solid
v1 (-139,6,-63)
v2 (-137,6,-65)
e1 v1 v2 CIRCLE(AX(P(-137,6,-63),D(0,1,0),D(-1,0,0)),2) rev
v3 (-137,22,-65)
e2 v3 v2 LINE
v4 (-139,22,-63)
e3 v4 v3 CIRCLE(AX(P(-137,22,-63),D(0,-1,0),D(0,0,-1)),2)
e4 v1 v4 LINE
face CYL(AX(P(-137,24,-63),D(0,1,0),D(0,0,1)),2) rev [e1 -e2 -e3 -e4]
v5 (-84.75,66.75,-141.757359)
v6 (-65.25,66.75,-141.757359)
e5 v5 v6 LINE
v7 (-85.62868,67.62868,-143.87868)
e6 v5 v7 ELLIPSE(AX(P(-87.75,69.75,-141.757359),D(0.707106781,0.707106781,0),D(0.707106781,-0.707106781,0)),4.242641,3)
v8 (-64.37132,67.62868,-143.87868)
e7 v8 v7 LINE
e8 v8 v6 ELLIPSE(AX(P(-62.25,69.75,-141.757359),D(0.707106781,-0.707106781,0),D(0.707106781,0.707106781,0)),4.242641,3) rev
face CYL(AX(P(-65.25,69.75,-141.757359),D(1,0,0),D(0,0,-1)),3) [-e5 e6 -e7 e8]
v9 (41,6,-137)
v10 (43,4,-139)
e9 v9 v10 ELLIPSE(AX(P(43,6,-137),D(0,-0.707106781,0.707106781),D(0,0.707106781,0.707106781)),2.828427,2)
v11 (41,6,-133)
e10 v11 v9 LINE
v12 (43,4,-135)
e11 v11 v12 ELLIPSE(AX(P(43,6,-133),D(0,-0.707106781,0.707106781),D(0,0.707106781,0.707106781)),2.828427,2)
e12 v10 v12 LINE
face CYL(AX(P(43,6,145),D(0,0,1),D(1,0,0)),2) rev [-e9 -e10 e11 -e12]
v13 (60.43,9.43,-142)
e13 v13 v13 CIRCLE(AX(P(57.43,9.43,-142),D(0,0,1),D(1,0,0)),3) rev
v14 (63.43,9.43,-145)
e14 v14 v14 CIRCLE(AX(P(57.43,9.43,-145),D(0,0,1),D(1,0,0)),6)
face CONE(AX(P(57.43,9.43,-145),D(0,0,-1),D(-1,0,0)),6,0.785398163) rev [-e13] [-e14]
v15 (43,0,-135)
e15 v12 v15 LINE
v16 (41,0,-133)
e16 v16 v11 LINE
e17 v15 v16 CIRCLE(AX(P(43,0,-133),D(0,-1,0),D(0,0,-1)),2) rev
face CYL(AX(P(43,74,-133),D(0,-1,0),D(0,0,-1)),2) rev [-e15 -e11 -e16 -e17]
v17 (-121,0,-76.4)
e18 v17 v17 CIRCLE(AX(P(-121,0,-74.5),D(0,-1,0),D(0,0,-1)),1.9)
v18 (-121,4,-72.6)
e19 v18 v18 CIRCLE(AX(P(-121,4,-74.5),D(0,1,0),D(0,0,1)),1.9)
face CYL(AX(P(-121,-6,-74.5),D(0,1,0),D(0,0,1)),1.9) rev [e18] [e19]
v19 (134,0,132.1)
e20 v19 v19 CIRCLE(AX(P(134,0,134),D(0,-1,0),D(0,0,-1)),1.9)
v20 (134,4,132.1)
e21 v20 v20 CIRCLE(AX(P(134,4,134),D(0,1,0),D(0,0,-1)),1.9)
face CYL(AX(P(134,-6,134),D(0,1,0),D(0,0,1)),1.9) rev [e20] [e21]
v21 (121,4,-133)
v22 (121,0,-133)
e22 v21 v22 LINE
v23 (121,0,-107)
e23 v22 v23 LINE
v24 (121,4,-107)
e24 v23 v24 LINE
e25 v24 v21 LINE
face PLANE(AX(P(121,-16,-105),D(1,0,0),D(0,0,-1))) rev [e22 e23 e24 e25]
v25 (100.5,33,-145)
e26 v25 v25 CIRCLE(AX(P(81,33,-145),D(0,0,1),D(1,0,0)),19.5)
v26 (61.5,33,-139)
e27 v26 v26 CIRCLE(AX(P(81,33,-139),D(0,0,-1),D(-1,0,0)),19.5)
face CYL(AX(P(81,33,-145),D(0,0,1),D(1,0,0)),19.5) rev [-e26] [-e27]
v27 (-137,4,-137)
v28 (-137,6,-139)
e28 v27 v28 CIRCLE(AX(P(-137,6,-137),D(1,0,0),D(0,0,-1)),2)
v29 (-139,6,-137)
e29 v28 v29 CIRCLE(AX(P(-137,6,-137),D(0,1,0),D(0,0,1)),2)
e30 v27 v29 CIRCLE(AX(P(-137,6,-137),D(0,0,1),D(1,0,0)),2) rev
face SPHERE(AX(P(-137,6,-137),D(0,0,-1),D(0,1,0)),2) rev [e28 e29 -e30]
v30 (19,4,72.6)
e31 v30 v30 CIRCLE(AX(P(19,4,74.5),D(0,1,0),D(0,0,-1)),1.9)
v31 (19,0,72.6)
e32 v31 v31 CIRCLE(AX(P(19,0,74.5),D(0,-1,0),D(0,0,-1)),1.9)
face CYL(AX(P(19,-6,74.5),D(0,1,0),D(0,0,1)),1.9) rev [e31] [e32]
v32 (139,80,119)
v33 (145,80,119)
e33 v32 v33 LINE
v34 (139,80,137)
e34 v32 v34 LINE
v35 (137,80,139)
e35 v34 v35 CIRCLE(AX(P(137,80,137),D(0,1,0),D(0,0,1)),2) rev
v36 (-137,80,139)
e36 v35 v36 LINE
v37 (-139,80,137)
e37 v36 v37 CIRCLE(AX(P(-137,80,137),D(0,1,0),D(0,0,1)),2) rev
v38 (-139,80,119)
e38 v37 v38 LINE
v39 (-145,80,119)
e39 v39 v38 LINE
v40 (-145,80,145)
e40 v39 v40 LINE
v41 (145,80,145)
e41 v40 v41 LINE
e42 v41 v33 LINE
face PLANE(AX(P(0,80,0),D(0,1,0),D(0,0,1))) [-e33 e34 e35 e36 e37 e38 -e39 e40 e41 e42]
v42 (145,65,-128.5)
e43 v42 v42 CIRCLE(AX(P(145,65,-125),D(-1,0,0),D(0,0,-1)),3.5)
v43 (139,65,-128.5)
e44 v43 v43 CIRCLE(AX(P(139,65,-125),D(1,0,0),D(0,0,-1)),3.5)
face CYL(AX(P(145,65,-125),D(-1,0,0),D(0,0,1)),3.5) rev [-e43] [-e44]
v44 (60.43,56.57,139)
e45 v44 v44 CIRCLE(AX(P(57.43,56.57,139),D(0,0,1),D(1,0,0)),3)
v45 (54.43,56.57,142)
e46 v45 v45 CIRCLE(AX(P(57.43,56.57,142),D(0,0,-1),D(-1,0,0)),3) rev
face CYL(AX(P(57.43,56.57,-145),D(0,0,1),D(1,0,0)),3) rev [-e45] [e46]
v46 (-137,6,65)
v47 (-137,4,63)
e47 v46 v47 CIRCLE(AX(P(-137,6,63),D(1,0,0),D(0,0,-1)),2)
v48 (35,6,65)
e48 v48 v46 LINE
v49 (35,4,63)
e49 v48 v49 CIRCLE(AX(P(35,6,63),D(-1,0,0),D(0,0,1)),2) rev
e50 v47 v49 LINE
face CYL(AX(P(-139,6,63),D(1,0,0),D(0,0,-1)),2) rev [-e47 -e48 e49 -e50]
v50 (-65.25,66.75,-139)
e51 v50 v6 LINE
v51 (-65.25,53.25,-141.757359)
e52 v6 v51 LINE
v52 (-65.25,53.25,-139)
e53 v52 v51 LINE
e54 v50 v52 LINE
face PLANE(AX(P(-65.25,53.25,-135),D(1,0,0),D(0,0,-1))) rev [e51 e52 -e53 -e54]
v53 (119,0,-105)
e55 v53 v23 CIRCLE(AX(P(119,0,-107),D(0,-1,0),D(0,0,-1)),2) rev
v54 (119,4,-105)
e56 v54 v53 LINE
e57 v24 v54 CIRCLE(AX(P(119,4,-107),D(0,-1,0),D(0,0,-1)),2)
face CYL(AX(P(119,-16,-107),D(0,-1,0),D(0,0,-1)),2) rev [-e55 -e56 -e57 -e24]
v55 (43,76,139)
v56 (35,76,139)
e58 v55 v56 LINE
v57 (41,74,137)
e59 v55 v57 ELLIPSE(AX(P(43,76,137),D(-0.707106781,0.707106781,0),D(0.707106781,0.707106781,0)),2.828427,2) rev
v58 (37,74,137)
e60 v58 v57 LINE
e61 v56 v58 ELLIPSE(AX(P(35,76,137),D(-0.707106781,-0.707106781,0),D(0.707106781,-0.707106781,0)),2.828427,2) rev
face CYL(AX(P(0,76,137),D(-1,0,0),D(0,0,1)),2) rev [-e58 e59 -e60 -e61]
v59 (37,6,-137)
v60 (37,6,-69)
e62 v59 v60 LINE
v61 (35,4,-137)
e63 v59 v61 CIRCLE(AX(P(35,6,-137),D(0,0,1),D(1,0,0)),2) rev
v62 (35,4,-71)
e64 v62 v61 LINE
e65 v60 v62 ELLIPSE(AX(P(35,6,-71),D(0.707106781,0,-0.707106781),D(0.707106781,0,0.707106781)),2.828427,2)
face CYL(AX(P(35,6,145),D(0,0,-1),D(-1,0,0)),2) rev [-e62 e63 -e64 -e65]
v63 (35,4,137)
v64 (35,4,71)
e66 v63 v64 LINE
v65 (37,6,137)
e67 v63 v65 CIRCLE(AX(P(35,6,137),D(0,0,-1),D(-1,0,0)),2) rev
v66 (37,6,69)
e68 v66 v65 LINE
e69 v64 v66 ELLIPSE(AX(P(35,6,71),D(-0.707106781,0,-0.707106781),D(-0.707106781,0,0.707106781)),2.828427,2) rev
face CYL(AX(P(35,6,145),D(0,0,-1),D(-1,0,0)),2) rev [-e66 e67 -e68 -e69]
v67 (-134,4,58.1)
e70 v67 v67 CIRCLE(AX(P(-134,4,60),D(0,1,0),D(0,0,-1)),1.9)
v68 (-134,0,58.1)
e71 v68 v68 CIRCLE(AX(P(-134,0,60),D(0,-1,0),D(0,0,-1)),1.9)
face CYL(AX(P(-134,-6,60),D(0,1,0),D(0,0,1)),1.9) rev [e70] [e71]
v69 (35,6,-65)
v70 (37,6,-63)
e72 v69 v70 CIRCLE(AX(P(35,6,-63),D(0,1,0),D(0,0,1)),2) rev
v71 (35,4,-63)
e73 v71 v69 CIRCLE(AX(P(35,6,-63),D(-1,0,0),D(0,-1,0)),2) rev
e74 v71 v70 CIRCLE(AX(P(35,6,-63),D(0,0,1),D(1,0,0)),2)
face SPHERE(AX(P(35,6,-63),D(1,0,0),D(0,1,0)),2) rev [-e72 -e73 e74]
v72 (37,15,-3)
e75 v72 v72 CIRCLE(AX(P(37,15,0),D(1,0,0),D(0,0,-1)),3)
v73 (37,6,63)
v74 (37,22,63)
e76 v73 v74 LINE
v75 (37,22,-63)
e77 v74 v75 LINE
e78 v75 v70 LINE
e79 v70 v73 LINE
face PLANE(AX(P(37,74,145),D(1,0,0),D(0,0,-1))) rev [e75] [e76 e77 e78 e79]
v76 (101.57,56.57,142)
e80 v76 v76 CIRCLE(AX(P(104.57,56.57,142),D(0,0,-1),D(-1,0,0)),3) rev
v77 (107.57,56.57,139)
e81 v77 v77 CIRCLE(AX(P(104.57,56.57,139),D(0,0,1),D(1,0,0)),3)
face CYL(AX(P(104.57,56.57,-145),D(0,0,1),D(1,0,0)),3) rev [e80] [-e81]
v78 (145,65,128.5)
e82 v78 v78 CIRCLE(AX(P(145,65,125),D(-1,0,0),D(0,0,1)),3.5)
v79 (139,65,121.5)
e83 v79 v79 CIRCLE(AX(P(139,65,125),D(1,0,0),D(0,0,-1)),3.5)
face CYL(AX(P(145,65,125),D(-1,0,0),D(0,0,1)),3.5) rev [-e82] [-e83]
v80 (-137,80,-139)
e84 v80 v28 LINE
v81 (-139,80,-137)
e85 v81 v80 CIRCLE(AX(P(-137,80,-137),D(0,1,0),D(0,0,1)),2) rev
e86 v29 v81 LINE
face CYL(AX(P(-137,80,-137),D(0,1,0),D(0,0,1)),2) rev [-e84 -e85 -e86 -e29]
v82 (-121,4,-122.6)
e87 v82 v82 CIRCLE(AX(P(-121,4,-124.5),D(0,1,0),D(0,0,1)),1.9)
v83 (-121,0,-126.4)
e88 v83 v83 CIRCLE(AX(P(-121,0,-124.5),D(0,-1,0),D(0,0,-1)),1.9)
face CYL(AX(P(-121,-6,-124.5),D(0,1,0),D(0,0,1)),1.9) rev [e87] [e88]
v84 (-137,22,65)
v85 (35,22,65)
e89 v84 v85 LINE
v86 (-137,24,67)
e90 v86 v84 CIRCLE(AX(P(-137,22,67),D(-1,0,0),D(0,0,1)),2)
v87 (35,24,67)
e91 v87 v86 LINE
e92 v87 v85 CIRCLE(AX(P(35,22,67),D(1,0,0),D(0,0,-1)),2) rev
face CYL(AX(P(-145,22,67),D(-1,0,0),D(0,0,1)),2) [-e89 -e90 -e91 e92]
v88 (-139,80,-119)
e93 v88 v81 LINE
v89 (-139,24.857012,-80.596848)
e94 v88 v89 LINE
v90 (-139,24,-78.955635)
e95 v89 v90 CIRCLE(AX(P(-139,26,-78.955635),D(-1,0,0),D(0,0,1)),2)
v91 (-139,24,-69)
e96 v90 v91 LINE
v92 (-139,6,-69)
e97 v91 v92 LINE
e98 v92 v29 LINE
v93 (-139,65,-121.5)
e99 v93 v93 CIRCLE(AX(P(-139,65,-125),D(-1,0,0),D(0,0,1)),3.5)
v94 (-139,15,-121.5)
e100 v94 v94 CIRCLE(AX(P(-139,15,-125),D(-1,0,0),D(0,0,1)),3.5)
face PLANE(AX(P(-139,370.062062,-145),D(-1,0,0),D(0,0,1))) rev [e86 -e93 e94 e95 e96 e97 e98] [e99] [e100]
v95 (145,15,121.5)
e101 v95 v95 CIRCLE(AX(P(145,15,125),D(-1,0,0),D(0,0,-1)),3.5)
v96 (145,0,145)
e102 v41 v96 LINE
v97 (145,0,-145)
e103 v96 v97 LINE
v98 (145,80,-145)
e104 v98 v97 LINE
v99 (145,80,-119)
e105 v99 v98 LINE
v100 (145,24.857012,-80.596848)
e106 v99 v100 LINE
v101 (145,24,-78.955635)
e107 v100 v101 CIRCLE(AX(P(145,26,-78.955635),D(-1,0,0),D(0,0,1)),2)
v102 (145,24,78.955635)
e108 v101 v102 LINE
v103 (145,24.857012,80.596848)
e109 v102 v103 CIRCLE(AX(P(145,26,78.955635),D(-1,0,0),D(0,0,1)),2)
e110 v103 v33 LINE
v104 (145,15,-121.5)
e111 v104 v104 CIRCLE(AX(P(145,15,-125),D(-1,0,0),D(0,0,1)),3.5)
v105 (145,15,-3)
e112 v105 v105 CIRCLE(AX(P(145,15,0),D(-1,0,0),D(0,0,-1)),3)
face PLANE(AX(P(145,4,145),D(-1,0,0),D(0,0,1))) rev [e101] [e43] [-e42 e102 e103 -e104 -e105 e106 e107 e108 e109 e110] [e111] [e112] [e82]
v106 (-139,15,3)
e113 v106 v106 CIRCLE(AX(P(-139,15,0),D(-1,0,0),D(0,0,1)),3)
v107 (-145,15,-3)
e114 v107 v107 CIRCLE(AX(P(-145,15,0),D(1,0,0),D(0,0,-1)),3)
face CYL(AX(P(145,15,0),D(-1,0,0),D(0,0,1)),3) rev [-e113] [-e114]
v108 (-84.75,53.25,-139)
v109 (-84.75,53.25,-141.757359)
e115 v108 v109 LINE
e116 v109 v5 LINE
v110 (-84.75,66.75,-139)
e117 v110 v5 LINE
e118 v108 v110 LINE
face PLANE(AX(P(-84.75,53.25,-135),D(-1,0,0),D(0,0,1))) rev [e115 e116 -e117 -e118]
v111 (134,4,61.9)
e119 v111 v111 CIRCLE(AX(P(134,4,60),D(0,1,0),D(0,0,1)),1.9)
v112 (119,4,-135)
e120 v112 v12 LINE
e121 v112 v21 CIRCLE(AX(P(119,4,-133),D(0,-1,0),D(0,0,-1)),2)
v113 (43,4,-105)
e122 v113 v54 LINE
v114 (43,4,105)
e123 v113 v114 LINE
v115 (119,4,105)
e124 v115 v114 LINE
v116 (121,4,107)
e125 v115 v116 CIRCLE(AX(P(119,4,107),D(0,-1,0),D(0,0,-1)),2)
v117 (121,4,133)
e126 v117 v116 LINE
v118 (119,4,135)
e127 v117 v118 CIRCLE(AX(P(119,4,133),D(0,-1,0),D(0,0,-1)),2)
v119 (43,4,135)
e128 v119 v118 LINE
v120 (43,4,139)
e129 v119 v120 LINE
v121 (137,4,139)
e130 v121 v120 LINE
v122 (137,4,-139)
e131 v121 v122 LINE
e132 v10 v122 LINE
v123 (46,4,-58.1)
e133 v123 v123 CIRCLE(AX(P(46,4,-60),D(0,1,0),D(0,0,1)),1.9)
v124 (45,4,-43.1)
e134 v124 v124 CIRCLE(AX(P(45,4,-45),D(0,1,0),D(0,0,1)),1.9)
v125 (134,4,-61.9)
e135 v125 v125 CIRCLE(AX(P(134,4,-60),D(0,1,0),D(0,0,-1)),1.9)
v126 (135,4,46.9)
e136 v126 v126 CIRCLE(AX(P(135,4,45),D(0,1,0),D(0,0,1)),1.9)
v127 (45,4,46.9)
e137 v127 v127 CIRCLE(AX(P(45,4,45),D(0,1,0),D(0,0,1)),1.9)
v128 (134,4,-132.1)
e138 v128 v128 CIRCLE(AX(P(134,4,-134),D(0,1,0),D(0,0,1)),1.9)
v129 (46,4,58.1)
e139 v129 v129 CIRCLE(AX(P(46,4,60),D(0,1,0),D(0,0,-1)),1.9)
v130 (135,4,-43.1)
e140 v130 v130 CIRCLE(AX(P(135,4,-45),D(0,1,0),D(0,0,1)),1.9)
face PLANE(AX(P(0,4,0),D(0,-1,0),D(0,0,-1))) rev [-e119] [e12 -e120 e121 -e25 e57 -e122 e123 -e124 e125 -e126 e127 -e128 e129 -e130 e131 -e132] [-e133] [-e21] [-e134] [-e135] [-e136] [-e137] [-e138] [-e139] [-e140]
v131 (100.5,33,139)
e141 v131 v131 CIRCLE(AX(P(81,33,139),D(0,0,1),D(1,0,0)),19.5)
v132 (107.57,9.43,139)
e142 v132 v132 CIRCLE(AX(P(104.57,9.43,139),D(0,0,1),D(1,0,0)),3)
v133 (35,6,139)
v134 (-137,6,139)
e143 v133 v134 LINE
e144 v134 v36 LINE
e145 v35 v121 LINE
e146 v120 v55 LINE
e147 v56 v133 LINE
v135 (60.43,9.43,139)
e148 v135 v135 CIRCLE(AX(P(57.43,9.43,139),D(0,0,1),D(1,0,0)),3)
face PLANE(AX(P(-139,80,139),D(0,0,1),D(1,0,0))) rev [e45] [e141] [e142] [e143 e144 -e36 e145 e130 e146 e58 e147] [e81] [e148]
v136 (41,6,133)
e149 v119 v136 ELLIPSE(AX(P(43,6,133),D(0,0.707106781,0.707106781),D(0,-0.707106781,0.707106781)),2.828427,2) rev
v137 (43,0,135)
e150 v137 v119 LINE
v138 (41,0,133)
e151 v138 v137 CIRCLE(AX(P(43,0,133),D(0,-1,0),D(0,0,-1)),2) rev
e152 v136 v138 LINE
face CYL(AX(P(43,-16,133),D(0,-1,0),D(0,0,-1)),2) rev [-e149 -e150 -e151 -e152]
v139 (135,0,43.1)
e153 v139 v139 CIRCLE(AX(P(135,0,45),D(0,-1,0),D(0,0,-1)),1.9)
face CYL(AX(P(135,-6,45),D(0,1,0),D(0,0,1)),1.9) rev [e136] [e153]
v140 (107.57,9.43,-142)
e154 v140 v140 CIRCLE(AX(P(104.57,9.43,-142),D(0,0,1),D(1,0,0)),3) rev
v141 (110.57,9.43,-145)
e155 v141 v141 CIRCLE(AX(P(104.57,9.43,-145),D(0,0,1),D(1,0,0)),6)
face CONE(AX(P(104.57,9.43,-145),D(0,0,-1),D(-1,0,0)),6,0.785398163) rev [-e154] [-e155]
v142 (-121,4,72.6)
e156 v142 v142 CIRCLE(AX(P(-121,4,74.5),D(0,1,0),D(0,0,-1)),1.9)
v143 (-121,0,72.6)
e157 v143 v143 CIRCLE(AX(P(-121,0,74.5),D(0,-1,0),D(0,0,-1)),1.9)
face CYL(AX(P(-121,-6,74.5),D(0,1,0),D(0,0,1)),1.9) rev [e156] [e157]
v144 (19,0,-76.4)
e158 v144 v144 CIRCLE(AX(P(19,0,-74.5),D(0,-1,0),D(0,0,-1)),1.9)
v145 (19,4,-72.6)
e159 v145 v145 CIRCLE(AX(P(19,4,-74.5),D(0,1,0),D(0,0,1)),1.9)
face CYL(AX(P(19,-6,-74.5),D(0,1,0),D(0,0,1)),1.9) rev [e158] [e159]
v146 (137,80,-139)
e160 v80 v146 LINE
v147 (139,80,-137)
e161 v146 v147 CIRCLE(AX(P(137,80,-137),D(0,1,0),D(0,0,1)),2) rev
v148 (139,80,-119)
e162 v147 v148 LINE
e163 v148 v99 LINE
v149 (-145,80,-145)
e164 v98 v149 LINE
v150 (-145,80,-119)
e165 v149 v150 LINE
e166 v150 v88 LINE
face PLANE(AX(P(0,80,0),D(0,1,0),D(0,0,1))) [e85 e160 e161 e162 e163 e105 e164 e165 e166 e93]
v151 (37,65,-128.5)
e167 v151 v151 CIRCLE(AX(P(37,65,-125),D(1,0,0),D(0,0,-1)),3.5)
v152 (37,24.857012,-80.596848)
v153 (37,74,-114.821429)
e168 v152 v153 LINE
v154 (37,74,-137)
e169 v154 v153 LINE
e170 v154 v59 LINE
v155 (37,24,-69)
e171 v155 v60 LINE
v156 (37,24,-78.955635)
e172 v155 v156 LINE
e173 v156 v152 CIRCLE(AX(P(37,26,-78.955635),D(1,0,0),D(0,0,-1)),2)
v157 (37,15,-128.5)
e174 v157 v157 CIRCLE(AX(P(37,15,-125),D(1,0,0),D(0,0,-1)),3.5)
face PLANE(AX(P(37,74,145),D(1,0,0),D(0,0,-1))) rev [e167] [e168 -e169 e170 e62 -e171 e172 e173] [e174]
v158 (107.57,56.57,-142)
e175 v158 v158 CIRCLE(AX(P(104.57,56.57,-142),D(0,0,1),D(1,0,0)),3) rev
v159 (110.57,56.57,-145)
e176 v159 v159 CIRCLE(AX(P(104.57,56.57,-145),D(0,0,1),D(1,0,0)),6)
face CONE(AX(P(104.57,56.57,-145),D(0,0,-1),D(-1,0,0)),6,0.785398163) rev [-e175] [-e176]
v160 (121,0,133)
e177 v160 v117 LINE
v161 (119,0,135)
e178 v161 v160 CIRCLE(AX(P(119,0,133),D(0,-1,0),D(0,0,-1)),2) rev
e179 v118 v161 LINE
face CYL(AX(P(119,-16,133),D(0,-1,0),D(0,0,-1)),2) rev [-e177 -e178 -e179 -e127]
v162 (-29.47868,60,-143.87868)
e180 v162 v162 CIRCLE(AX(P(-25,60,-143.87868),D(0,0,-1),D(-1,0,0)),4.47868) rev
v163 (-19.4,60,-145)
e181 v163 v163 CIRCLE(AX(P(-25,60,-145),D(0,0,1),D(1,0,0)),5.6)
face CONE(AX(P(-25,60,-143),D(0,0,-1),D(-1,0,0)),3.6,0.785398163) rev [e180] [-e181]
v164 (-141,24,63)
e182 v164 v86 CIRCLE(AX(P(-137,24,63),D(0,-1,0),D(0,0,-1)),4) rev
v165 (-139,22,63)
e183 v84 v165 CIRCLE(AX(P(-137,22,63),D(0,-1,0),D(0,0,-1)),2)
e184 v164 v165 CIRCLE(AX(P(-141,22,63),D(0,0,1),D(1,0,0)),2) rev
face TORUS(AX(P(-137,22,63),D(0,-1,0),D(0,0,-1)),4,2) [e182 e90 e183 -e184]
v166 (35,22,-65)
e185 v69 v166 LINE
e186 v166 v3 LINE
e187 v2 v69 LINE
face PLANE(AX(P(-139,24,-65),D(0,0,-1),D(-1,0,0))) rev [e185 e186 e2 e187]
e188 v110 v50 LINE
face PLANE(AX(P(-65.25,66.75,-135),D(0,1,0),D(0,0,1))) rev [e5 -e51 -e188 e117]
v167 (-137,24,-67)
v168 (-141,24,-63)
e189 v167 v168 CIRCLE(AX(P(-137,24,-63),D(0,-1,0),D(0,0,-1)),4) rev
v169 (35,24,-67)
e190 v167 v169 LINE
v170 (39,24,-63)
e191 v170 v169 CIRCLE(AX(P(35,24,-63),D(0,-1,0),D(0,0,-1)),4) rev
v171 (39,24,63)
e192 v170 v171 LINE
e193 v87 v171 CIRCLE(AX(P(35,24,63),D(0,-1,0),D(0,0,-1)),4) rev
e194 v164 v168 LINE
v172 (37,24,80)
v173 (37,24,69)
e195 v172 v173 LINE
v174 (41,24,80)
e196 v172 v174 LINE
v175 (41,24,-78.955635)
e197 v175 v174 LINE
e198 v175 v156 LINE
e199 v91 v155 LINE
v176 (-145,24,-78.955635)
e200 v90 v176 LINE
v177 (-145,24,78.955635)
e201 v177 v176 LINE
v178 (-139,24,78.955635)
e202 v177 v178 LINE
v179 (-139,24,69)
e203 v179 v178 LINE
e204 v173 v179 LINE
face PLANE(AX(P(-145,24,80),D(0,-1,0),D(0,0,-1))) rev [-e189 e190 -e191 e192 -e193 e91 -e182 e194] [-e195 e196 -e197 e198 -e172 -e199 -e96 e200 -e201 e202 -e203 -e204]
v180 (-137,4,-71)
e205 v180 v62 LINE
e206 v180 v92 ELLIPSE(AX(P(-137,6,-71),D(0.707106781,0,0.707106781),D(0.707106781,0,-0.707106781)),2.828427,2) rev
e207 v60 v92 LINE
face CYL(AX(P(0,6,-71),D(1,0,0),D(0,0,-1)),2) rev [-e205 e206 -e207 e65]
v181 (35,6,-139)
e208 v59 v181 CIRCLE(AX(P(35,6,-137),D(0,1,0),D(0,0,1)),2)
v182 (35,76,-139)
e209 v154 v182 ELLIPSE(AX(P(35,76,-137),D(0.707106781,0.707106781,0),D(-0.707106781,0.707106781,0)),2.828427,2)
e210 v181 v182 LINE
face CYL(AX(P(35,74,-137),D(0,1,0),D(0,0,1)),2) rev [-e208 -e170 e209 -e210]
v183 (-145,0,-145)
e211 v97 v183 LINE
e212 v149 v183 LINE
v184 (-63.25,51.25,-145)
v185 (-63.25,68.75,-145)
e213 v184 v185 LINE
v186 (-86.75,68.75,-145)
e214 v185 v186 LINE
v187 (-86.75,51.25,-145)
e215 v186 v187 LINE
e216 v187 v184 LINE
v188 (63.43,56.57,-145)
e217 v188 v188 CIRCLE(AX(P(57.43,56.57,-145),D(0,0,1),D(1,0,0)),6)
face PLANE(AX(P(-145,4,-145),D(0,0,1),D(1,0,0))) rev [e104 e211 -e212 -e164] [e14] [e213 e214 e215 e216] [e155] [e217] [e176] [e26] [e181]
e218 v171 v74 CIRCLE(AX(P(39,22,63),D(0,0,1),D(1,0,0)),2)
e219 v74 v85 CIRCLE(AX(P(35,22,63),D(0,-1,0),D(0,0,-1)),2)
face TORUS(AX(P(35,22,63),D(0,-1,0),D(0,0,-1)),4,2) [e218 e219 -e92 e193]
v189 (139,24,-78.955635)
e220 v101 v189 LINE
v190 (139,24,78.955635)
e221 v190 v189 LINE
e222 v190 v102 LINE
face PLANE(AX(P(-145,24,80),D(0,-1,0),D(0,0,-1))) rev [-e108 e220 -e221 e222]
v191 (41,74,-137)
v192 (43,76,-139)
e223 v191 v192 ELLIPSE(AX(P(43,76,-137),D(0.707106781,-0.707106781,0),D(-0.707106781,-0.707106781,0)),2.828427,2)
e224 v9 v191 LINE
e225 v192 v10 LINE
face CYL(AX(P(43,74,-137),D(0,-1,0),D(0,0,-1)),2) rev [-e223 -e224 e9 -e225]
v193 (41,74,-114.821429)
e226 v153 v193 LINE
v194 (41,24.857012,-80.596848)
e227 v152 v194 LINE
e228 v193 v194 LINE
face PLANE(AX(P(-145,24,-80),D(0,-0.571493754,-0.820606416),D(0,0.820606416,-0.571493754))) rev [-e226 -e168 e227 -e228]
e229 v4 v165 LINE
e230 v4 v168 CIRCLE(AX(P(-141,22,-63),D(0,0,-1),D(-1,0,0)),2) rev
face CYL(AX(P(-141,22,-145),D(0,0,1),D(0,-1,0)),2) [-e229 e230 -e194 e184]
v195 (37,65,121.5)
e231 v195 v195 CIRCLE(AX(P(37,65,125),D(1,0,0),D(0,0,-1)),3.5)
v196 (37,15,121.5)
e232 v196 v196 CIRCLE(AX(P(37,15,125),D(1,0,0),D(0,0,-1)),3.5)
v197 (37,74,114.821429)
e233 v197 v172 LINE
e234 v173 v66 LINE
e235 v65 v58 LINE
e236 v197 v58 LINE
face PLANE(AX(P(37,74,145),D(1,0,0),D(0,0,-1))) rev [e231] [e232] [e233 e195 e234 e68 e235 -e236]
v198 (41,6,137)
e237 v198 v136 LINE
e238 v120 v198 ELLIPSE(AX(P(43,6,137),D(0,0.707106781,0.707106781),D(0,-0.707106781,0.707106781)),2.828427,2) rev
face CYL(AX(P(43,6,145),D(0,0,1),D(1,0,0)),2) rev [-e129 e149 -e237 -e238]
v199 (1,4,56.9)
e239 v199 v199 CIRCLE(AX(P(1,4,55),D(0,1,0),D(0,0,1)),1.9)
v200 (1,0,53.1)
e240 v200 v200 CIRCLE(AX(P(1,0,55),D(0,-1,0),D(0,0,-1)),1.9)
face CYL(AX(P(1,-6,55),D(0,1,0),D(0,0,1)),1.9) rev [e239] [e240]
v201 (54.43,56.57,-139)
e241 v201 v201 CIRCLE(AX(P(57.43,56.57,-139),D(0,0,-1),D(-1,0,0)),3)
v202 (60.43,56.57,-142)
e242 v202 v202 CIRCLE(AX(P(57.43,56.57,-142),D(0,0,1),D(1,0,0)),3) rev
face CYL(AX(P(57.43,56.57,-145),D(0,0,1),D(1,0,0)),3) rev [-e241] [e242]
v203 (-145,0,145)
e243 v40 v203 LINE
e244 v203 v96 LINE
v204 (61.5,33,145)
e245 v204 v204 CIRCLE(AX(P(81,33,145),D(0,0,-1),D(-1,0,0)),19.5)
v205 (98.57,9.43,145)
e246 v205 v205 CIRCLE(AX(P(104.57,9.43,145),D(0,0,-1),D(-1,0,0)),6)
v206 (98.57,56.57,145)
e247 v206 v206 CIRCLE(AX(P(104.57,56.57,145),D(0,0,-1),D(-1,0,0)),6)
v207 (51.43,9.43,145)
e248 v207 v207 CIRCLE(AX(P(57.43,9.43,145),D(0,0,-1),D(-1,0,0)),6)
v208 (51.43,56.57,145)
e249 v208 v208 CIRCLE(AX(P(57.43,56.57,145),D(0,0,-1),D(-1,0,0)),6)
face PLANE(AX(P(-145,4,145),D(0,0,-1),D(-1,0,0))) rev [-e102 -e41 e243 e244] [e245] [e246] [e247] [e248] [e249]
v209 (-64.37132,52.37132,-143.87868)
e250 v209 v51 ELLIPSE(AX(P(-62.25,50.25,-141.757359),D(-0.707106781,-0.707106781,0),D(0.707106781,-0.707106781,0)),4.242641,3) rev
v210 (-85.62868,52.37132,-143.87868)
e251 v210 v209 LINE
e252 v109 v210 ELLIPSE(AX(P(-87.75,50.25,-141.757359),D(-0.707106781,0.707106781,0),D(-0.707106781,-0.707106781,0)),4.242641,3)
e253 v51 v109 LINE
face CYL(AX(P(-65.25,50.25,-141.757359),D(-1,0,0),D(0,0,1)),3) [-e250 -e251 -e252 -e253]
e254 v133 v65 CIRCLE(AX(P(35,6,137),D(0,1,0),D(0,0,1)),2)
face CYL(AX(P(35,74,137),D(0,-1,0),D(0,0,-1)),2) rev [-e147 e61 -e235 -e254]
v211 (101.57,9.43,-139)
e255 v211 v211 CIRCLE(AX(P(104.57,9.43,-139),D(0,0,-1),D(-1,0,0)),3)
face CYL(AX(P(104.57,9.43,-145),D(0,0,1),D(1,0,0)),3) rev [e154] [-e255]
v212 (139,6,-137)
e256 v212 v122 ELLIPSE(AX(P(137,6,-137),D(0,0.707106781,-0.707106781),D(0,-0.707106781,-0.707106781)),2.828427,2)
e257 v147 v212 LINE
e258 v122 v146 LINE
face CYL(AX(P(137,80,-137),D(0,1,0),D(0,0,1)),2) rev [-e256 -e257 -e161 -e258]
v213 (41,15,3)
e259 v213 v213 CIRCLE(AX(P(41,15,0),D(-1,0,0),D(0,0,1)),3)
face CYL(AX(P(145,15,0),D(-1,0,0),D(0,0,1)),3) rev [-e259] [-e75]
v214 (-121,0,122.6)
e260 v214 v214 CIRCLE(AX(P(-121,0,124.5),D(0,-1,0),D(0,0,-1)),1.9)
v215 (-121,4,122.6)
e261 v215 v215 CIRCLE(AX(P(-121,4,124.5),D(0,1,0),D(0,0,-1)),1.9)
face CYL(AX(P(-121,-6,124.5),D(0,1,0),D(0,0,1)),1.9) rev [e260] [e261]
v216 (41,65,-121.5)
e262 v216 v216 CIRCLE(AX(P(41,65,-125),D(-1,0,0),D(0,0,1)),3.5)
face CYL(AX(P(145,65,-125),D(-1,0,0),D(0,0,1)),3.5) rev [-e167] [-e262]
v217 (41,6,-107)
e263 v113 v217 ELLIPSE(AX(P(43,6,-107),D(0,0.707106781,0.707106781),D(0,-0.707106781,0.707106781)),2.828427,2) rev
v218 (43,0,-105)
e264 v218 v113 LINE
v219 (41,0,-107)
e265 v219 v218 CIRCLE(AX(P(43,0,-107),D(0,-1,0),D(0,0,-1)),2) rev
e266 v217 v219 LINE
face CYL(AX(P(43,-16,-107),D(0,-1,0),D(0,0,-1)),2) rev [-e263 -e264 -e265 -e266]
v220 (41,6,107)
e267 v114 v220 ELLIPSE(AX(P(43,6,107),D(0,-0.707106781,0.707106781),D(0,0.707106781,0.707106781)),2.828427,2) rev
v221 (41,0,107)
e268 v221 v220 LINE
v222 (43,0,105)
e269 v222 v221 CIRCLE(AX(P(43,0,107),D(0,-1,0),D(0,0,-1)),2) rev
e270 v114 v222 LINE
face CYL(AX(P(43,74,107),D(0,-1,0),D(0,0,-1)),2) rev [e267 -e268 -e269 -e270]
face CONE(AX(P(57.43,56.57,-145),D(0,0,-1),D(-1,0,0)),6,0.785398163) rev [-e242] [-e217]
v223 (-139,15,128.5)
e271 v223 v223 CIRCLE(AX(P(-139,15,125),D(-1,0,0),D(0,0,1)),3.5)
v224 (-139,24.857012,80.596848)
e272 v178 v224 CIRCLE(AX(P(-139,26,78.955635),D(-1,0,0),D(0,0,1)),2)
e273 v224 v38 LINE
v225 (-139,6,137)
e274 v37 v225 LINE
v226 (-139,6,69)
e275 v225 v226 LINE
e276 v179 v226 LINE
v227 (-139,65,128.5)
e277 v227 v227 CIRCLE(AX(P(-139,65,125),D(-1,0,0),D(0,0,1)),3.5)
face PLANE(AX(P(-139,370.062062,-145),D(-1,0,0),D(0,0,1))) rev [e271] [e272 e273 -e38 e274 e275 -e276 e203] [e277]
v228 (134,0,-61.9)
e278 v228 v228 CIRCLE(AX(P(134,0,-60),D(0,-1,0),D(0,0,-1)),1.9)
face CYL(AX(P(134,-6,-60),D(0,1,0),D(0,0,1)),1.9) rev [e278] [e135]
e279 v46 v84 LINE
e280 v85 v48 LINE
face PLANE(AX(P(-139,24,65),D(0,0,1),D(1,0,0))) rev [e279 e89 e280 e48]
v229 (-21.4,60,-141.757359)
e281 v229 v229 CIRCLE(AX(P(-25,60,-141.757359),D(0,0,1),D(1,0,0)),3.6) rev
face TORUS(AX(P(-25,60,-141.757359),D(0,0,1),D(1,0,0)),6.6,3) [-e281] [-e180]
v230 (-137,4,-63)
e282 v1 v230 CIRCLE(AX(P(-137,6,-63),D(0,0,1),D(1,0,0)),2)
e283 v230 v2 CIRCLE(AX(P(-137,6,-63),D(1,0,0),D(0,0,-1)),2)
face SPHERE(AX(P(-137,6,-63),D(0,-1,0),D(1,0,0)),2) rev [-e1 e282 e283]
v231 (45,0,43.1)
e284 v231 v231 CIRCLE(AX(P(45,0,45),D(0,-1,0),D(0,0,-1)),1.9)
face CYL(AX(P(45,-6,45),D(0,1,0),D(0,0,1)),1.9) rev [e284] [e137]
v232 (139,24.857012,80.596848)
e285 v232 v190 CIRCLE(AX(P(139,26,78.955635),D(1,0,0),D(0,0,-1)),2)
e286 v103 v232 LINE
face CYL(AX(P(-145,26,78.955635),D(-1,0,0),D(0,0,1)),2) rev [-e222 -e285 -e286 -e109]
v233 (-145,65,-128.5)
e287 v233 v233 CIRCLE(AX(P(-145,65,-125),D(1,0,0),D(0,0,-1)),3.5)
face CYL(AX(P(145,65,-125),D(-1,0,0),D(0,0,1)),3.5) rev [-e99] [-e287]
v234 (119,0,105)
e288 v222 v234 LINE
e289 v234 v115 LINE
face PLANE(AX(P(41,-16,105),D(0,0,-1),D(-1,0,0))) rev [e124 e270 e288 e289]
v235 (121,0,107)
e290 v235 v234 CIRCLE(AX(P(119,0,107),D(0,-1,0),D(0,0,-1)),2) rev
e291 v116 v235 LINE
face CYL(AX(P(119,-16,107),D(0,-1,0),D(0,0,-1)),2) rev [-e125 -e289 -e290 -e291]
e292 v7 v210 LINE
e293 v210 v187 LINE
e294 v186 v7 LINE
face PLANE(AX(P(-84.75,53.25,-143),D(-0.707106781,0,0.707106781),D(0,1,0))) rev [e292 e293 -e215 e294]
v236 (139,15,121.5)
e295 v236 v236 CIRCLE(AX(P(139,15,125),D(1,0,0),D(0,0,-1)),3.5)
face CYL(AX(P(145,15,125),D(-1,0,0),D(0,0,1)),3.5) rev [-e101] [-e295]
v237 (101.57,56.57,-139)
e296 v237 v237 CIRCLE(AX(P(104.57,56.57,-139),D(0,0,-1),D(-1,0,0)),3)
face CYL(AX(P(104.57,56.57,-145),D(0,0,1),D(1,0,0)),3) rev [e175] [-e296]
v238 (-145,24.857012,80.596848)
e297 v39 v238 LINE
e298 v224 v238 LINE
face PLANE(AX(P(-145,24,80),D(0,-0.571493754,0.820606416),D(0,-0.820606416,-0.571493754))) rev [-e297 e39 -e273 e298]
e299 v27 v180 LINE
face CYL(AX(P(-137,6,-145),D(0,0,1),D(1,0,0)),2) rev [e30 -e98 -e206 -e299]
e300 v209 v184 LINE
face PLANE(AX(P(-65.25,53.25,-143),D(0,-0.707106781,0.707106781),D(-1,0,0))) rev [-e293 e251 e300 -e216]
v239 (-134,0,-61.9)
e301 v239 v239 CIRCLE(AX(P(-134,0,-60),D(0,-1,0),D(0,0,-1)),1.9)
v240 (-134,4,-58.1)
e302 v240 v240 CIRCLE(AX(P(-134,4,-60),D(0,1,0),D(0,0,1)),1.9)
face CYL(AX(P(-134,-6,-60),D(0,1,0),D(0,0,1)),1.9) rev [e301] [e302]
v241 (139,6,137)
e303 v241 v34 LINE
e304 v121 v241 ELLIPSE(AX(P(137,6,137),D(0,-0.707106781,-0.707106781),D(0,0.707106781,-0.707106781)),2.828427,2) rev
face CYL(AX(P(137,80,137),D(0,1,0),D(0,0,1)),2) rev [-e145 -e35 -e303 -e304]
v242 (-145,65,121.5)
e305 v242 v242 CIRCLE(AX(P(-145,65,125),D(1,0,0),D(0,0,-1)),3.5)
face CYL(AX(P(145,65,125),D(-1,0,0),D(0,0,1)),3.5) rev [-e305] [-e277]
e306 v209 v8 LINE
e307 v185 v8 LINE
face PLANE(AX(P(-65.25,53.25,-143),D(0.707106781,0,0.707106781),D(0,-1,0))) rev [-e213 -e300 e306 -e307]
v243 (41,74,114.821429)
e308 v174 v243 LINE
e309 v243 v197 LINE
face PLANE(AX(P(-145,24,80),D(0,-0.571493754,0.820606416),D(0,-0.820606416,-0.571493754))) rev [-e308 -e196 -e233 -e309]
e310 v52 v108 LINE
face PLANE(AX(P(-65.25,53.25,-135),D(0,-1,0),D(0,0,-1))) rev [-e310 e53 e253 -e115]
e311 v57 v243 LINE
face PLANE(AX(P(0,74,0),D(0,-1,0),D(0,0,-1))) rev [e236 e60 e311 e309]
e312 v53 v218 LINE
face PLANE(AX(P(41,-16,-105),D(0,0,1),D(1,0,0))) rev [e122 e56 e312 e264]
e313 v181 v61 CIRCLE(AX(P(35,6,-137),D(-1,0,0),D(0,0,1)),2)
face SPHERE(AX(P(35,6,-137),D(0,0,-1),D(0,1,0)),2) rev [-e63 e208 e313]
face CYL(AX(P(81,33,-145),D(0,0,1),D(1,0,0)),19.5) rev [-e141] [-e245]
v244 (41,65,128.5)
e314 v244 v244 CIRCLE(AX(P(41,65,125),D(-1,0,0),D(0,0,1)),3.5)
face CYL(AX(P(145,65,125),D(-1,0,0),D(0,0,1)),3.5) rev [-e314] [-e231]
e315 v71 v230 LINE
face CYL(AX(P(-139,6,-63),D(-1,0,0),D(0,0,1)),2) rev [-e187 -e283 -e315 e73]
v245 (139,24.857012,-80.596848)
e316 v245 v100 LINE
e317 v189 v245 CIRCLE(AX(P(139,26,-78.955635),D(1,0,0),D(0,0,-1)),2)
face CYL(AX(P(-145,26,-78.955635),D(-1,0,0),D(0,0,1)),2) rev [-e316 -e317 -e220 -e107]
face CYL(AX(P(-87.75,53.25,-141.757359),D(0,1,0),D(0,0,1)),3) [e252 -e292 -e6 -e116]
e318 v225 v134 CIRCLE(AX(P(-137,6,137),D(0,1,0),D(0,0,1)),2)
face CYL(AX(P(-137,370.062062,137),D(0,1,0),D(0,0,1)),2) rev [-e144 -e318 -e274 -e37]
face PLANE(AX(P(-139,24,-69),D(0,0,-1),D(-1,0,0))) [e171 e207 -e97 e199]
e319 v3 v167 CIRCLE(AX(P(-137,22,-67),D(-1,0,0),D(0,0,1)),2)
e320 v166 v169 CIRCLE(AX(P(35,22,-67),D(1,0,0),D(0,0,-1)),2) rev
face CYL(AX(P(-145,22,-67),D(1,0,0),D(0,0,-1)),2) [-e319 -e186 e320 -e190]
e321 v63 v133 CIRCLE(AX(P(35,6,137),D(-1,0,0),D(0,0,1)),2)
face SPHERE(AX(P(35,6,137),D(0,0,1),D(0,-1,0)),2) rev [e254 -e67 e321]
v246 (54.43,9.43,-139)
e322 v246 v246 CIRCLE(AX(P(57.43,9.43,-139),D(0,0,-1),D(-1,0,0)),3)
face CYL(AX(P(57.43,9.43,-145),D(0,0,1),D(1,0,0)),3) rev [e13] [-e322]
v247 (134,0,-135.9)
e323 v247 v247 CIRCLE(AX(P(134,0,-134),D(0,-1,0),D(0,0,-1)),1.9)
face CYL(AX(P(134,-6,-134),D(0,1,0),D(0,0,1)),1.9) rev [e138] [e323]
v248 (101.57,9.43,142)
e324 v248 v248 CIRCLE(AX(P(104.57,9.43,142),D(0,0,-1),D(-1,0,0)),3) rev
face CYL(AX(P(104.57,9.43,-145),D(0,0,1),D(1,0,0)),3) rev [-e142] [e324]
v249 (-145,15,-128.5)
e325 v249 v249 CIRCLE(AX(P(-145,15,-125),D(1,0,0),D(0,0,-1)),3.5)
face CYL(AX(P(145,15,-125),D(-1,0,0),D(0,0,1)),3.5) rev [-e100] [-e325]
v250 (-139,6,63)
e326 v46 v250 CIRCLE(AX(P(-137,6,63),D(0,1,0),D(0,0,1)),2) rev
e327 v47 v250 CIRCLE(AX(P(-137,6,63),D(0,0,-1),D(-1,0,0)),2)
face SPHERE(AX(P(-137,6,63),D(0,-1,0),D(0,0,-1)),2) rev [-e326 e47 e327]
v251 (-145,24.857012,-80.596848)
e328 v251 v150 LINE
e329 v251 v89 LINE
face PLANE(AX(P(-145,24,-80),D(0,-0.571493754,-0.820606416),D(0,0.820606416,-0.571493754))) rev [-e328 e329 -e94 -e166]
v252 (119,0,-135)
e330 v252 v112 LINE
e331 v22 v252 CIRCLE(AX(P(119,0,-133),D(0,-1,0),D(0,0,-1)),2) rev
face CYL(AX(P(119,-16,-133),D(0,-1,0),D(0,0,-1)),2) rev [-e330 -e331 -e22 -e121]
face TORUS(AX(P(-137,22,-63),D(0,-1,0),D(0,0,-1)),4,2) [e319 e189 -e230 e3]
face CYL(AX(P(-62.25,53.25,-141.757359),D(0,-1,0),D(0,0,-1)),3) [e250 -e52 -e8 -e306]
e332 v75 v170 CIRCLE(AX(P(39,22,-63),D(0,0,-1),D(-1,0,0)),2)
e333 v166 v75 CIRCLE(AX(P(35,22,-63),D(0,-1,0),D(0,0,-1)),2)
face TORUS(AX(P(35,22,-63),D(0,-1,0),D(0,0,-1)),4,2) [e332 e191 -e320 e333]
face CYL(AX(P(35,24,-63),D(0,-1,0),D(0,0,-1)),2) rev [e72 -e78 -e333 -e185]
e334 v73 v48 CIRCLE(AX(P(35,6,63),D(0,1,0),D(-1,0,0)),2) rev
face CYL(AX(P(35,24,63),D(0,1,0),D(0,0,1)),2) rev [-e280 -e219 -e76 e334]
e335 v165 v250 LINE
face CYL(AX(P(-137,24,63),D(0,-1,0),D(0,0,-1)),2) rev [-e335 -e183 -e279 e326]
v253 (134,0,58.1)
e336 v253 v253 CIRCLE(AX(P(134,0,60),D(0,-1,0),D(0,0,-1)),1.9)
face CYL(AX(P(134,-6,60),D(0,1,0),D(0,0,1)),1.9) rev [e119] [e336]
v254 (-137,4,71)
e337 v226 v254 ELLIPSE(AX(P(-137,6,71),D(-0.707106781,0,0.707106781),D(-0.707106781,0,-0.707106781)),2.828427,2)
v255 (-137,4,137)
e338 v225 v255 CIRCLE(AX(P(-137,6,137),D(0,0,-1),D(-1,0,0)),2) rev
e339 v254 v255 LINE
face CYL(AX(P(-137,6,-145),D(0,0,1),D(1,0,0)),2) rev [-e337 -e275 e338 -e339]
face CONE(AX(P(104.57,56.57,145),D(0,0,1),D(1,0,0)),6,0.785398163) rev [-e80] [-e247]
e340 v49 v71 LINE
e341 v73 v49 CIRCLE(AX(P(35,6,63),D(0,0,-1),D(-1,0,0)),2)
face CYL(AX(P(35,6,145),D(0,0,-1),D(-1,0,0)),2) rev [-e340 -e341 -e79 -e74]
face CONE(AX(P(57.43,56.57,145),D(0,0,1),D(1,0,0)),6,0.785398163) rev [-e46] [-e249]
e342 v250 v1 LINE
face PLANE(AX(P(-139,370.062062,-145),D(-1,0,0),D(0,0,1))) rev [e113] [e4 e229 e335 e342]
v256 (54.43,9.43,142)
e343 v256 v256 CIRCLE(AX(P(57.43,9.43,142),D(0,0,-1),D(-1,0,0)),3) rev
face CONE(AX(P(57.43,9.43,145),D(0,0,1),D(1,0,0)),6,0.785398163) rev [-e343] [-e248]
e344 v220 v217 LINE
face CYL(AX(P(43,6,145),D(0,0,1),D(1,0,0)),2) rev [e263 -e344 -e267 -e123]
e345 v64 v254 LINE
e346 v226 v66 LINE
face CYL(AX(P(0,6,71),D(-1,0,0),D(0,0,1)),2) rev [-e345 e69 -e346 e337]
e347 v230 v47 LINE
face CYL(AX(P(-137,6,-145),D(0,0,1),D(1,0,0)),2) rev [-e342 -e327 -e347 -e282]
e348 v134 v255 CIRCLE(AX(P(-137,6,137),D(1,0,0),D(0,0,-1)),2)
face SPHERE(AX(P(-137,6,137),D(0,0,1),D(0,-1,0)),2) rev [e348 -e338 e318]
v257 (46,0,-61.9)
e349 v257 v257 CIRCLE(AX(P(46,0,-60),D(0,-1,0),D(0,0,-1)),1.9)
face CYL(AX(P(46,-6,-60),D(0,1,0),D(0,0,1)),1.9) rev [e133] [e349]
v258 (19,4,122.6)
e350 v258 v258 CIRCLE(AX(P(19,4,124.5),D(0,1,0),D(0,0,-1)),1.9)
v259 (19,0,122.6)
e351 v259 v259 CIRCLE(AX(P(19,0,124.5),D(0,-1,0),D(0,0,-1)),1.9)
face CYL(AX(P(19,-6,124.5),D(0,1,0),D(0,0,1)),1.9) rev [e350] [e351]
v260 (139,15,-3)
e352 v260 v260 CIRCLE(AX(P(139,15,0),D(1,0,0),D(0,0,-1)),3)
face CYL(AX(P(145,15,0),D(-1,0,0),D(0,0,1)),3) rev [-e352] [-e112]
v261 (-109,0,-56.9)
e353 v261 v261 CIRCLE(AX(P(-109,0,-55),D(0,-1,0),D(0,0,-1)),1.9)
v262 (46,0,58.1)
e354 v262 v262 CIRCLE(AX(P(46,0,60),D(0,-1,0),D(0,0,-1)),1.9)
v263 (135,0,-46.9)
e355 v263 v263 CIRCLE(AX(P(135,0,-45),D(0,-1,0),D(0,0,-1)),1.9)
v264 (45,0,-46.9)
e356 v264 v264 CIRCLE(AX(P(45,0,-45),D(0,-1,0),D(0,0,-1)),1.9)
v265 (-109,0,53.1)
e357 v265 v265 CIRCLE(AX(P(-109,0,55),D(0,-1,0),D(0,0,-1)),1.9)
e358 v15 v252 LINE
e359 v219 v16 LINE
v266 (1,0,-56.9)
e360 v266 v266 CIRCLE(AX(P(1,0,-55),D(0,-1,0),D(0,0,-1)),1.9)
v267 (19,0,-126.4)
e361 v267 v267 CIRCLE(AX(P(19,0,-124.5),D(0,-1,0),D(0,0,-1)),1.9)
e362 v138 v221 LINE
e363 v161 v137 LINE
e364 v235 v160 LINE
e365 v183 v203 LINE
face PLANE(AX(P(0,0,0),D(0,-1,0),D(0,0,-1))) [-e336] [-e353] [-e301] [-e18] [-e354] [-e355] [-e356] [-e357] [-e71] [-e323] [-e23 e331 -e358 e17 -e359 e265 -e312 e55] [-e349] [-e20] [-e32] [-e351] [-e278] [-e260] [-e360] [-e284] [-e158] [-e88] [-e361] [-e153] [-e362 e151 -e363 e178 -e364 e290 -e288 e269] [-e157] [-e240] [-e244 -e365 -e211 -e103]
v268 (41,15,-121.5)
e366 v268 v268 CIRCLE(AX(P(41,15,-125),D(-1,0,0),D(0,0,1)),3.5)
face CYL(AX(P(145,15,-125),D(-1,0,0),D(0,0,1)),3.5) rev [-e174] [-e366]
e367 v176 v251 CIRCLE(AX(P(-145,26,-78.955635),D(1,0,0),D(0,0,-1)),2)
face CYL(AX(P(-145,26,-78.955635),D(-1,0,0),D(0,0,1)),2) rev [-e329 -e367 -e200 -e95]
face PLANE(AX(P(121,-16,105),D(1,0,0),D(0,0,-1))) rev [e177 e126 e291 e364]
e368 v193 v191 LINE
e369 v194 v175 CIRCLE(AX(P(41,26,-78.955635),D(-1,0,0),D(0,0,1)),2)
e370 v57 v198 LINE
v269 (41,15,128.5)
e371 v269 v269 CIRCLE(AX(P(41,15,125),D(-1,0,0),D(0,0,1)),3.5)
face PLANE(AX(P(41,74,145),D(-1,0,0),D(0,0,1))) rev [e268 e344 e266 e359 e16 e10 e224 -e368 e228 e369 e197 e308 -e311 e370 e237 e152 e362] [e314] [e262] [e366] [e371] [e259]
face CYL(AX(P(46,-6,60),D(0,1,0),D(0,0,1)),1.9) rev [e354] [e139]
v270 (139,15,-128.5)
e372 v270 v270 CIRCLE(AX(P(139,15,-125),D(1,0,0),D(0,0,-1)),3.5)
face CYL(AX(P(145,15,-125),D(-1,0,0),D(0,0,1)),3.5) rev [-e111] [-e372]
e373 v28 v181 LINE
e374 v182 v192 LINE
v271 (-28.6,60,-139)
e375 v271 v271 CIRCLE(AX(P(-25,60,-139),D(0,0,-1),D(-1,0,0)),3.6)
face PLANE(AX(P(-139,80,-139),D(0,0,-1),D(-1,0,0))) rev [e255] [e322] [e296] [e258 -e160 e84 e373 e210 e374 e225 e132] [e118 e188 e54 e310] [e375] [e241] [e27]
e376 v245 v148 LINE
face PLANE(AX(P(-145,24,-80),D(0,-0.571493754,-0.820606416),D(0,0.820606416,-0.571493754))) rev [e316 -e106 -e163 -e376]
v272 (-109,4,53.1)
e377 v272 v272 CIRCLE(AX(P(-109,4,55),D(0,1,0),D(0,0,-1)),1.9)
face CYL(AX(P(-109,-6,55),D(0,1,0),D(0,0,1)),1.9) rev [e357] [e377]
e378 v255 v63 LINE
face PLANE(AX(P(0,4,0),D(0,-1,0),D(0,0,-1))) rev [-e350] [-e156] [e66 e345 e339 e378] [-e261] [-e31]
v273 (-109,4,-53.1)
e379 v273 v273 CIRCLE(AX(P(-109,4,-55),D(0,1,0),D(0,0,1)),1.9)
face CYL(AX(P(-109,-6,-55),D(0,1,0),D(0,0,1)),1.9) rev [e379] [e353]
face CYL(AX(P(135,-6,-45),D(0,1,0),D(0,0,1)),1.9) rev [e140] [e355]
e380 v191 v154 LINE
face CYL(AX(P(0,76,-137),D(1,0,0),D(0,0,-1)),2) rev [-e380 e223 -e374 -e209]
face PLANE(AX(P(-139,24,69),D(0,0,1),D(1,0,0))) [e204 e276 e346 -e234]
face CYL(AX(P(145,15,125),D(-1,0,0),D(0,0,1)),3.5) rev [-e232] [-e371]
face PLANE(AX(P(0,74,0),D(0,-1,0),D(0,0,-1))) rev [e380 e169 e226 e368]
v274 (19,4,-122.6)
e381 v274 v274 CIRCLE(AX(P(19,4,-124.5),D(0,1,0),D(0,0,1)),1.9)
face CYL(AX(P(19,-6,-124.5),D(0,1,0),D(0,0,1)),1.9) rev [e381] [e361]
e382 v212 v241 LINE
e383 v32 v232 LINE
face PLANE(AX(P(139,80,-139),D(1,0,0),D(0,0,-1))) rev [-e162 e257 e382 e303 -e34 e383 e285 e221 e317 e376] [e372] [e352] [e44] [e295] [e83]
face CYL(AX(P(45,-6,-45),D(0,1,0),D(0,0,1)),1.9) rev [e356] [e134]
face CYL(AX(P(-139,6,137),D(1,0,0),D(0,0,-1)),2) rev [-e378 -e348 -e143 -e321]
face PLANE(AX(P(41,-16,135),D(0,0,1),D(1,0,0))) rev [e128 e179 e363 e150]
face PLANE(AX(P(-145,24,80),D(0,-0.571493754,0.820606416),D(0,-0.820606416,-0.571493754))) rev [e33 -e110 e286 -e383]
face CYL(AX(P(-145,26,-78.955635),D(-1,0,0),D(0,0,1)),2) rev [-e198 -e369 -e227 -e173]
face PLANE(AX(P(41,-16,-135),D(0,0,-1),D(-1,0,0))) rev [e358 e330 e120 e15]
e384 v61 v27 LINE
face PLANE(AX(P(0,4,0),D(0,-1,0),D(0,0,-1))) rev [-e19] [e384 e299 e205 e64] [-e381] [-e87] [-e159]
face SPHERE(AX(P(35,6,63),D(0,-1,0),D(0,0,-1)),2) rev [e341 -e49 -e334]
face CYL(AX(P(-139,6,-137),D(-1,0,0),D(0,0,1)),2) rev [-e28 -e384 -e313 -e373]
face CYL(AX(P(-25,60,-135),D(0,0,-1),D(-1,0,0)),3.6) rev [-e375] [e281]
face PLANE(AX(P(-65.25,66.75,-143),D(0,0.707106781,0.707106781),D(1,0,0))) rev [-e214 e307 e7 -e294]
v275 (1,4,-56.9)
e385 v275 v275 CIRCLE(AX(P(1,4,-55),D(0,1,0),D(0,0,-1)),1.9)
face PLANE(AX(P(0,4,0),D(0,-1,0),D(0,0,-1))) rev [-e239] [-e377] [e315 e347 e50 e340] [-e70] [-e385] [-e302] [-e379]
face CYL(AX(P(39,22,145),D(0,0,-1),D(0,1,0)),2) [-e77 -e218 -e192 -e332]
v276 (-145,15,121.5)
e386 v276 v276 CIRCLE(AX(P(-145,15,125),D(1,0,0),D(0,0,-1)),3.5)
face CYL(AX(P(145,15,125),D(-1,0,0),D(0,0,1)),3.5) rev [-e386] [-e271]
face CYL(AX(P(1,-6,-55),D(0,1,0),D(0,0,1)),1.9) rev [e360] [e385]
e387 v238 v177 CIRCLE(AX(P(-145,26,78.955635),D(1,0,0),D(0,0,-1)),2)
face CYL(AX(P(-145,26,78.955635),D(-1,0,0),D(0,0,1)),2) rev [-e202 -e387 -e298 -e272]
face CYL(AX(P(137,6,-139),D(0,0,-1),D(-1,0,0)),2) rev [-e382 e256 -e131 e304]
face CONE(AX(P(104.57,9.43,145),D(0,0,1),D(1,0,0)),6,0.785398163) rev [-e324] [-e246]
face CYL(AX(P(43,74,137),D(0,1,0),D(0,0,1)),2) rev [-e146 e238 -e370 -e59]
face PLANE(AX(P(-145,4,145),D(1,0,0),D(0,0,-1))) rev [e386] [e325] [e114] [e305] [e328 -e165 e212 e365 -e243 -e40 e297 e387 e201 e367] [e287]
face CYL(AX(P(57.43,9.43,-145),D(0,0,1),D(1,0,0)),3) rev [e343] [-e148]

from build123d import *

# Parameters (mm, degrees)
SKETCH_1_W                = 290
SKETCH_1_H                = 290
EXTRUDE_1_DEPTH           = 4
EXTRUDE_2_DEPTH           = 76
SKETCH_4_W                = 6
SKETCH_4_H                = 290
EXTRUDE_3_DEPTH           = 76
CUT_EXTRUDE_12_DEPTH      = 334.95358959
CUT_EXTRUDE_12_DEPTH_BACK = 334.95358959
SKETCH_17_R               = 19.5
SKETCH_17_R_2             = 3
SKETCH_18_W               = 4
SKETCH_18_H               = 290
EXTRUDE_4_DEPTH           = 70
CUT_EXTRUDE_13_DEPTH      = 334.95358959
CUT_EXTRUDE_13_DEPTH_BACK = 334.95358959
SKETCH_14_W               = 80
SKETCH_14_H               = 30
CUT_EXTRUDE_9_DEPTH       = 20
EXTRUDE_1_2_OUTLINE_W     = 176
EXTRUDE_1_2_OUTLINE_H     = 4
EXTRUDE_1_2_DEPTH         = 20
CUT_EXTRUDE_10_DEPTH      = 334.95358959
CUT_EXTRUDE_10_DEPTH_BACK = 334.95358959
SKETCH_15_R               = 3
SKETCH_15_R_2             = 3.5
SKETCH_7_R                = 1.9
CUT_EXTRUDE_3_DEPTH       = 10
FILLET_1_R                = 2
SKETCH_21_R               = 3.6
SKETCH_21_W               = 19.5
SKETCH_21_H               = 13.5
CUT_EXTRUDE_14_DEPTH      = 10
CHAMFER_1_SIZE            = 2
FILLET_2_R                = 3
CHAMFER_2_SIZE            = 3


# Read off the part's stored shape, not the designer's step: Вытянуть-Тонкостенный1
with BuildPart() as part:
    # Эскиз1 → Extrude 1 (new body)
    with BuildSketch(Plane(origin=(0, 0, 0), x_dir=(1, 0, 0), z_dir=(0, 1, 0))):
        Rectangle(SKETCH_1_W, SKETCH_1_H)
    extrude(amount=EXTRUDE_1_DEPTH)

    # Эскиз2 → Бобышка-Вытянуть2 (add)
    with BuildSketch(Plane(origin=(0, 4, 0), x_dir=(1, 0, 0), z_dir=(0, 1, 0))):
        Polygon((145, 145), (145, 0.239524614), (145, -145), (-139, -145), (-139, -139), (139, -139), (139, 139), (-139, 139), (-139, 145), align=None)
    extrude(amount=EXTRUDE_2_DEPTH)

    # Эскиз4 → Бобышка-Вытянуть3 (add)
    with BuildSketch(Plane(origin=(0, 4, 0), x_dir=(1, 0, 0), z_dir=(0, 1, 0))):
        with Locations((-142, 0)):
            Rectangle(SKETCH_4_W, SKETCH_4_H)
    extrude(amount=EXTRUDE_3_DEPTH)

    # Эскиз17 → Вырез-Вытянуть12 (cut, two sides: drawn at the far end of the back side and taken through both)
    with BuildSketch(Plane.XY.offset(145).offset(-CUT_EXTRUDE_12_DEPTH_BACK)):
        with Locations((81, 33)):
            Circle(SKETCH_17_R)
        with Locations((57.43, 56.57)):
            Circle(SKETCH_17_R_2)
        with Locations((104.57, 56.57)):
            Circle(SKETCH_17_R_2)
        with Locations((104.57, 9.43)):
            Circle(SKETCH_17_R_2)
        with Locations((57.43, 9.43)):
            Circle(SKETCH_17_R_2)
    extrude(amount=CUT_EXTRUDE_12_DEPTH + CUT_EXTRUDE_12_DEPTH_BACK, mode=Mode.SUBTRACT)

    # Эскиз18 → Бобышка-Вытянуть4 (add)
    with BuildSketch(Plane(origin=(0, 4, 0), x_dir=(1, 0, 0), z_dir=(0, 1, 0))):
        with Locations((39, 0)):
            Rectangle(SKETCH_18_W, SKETCH_18_H)
    extrude(amount=EXTRUDE_4_DEPTH)

    # Эскиз19 → Вырез-Вытянуть13 (cut, two sides: drawn at the far end of the back side and taken through both)
    with BuildSketch(Plane(origin=(145, 0, 0), x_dir=(0, 0, -1), z_dir=(1, 0, 0)).offset(-CUT_EXTRUDE_13_DEPTH_BACK)):
        Polygon((-80, 24), (80, 24), (119, 80), (-119, 80), align=None)
    extrude(amount=CUT_EXTRUDE_13_DEPTH + CUT_EXTRUDE_13_DEPTH_BACK, mode=Mode.SUBTRACT)

    # Эскиз14 → Вырез-Вытянуть9 (cut)
    with BuildSketch(Plane(origin=(0, 4, 0), x_dir=(1, 0, 0), z_dir=(0, 1, 0))):
        with Locations((81, 120)):
            Rectangle(SKETCH_14_W, SKETCH_14_H)
        with Locations((81, -120)):
            Rectangle(SKETCH_14_W, SKETCH_14_H)
    extrude(amount=-CUT_EXTRUDE_9_DEPTH, mode=Mode.SUBTRACT)

    # Extrude 1 2 outline → Extrude 1 2 (add)
    with BuildSketch(Plane(origin=(0, 4, 0), x_dir=(1, 0, 0), z_dir=(0, 1, 0))):
        with Locations((-51, 67)):
            Rectangle(EXTRUDE_1_2_OUTLINE_W, EXTRUDE_1_2_OUTLINE_H)
        with Locations((-51, -67)):
            Rectangle(EXTRUDE_1_2_OUTLINE_W, EXTRUDE_1_2_OUTLINE_H)
    extrude(amount=EXTRUDE_1_2_DEPTH)

    # Эскиз15 → Вырез-Вытянуть10 (cut, two sides: drawn at the far end of the back side and taken through both)
    with BuildSketch(Plane.ZY.offset(145).offset(-CUT_EXTRUDE_10_DEPTH_BACK)):
        with Locations((0, 65)):
            Circle(SKETCH_15_R)
        with Locations((125, 65)):
            Circle(SKETCH_15_R_2)
        with Locations((-125, 65)):
            Circle(SKETCH_15_R_2)
        with Locations((-125, 15)):
            Circle(SKETCH_15_R_2)
        with Locations((125, 15)):
            Circle(SKETCH_15_R_2)
        with Locations((0, 15)):
            Circle(SKETCH_15_R)
    extrude(amount=CUT_EXTRUDE_10_DEPTH + CUT_EXTRUDE_10_DEPTH_BACK, mode=Mode.SUBTRACT)

    # Эскиз7 → Вырез-Вытянуть3 (cut)
    with BuildSketch(Plane(origin=(0, 4, 0), x_dir=(1, 0, 0), z_dir=(0, 1, 0))):
        with Locations(Location((-109, 55, 0), (0, 0, 270))):
            Circle(SKETCH_7_R)
        with Locations(Location((1, 55, 0), (0, 0, 90))):
            Circle(SKETCH_7_R)
        with Locations(Location((1, -55, 0), (0, 0, 270))):
            Circle(SKETCH_7_R)
        with Locations(Location((-109, -55, 0), (0, 0, 90))):
            Circle(SKETCH_7_R)
        with Locations(Location((-134, 60, 0), (0, 0, 270))):
            Circle(SKETCH_7_R)
        with Locations(Location((-134, -60, 0), (0, 0, 90))):
            Circle(SKETCH_7_R)
        with Locations(Location((134, 134, 0), (0, 0, 270))):
            Circle(SKETCH_7_R)
        with Locations(Location((134, -134, 0), (0, 0, 90))):
            Circle(SKETCH_7_R)
        with Locations(Location((134, -60, 0), (0, 0, 270))):
            Circle(SKETCH_7_R)
        with Locations(Location((134, 60, 0), (0, 0, 90))):
            Circle(SKETCH_7_R)
        with Locations(Location((46, -60, 0), (0, 0, 90))):
            Circle(SKETCH_7_R)
        with Locations(Location((46, 60, 0), (0, 0, 270))):
            Circle(SKETCH_7_R)
        with Locations(Location((45, 45, 0), (0, 0, 270))):
            Circle(SKETCH_7_R)
        with Locations(Location((135, 45, 0), (0, 0, 270))):
            Circle(SKETCH_7_R)
        with Locations(Location((45, -45, 0), (0, 0, 270))):
            Circle(SKETCH_7_R)
        with Locations(Location((135, -45, 0), (0, 0, 270))):
            Circle(SKETCH_7_R)
        with Locations(Location((-121, 124.5, 0), (0, 0, 270))):
            Circle(SKETCH_7_R)
        with Locations(Location((-121, 74.5, 0), (0, 0, 270))):
            Circle(SKETCH_7_R)
        with Locations(Location((19, 124.5, 0), (0, 0, 270))):
            Circle(SKETCH_7_R)
        with Locations(Location((19, 74.5, 0), (0, 0, 270))):
            Circle(SKETCH_7_R)
        with Locations(Location((19, -74.5, 0), (0, 0, 90))):
            Circle(SKETCH_7_R)
        with Locations(Location((19, -124.5, 0), (0, 0, 90))):
            Circle(SKETCH_7_R)
        with Locations(Location((-121, -74.5, 0), (0, 0, 90))):
            Circle(SKETCH_7_R)
        with Locations(Location((-121, -124.5, 0), (0, 0, 90))):
            Circle(SKETCH_7_R)
    extrude(amount=-CUT_EXTRUDE_3_DEPTH, mode=Mode.SUBTRACT)

    # Скругление1
    fillet_1_edges = [part.edges().sort_by_distance(p)[0] for p in [
        (-142, 24, -80),
        (-142, 24, 80),
        (39, 24, -80),
        (-139, 24, 0),
        (-51, 24, -65),
        (37, 24, 0),
        (-51, 24, 65),
        (142, 24, 80),
        (139, 4, 0),
        (139, 42, 139),
        (139, 42, -139),
        (-51, 4, 139),
        (37, 39, 139),
        (39, 74, 139),
        (41, 39, 139),
        (-139, 42, 139),
        (-139, 4, 104),
        (142, 24, -80),
        (121, 2, 135),
        (41, 2, 135),
        (41, 4, 137),
        (41, 2, 105),
        (41, 4, 0),
        (41, 2, -105),
        (41, 2, -135),
        (41, 4, -137),
        (41, 39, -139),
        (121, 2, 105),
        (121, 2, -105),
        (121, 2, -135),
        (-139, 4, -104),
        (-139, 42, -139),
        (39, 74, -139),
        (37, 39, -139),
        (-51, 4, -139),
        (-51, 4, 69),
        (37, 4, 104),
        (37, 4, -104),
        (-51, 4, -69),
        (-139, 4, 0),
        (-139, 14, -65),
        (-139, 14, 65),
        (37, 14, -65),
        (-51, 4, -65),
        (37, 4, 0),
        (37, 14, 65),
        (-51, 4, 65),
    ]]
    fillet(fillet_1_edges, radius=FILLET_1_R)

    # Эскиз21 → Вырез-Вытянуть14 (cut)
    with BuildSketch(Plane(origin=(0, 0, -145), x_dir=(-1, 0, 0), z_dir=(0, 0, -1))):
        with Locations((25, 60)):
            Circle(SKETCH_21_R)
        with Locations((75, 60)):
            Rectangle(SKETCH_21_W, SKETCH_21_H)
    extrude(amount=-CUT_EXTRUDE_14_DEPTH, mode=Mode.SUBTRACT)

    # Фаска1
    chamfer_1_edges = [part.edges().sort_by_distance(p)[0] for p in [
        (-21.4, 60, -145),
        (-84.75, 60, -145),
        (-75, 66.75, -145),
        (-65.25, 60, -145),
        (-75, 53.25, -145),
    ]]
    chamfer(chamfer_1_edges, length=CHAMFER_1_SIZE)

    # Скругление2
    fillet_2_edges = [part.edges().sort_by_distance(p)[0] for p in [
        (-84.75, 60, -143),
        (-75, 66.75, -143),
        (-65.25, 60, -143),
        (-75, 53.25, -143),
        (-21.4, 60, -143),
    ]]
    fillet(fillet_2_edges, radius=FILLET_2_R)

    # Фаска2
    chamfer_2_edges = [part.edges().sort_by_distance(p)[0] for p in [
        (54.43, 9.43, 145),
        (54.43, 9.43, -145),
        (101.57, 9.43, 145),
        (101.57, 9.43, -145),
        (101.57, 56.57, 145),
        (101.57, 56.57, -145),
        (54.43, 56.57, 145),
        (54.43, 56.57, -145),
    ]]
    chamfer(chamfer_2_edges, length=CHAMFER_2_SIZE)


solid = part.part
